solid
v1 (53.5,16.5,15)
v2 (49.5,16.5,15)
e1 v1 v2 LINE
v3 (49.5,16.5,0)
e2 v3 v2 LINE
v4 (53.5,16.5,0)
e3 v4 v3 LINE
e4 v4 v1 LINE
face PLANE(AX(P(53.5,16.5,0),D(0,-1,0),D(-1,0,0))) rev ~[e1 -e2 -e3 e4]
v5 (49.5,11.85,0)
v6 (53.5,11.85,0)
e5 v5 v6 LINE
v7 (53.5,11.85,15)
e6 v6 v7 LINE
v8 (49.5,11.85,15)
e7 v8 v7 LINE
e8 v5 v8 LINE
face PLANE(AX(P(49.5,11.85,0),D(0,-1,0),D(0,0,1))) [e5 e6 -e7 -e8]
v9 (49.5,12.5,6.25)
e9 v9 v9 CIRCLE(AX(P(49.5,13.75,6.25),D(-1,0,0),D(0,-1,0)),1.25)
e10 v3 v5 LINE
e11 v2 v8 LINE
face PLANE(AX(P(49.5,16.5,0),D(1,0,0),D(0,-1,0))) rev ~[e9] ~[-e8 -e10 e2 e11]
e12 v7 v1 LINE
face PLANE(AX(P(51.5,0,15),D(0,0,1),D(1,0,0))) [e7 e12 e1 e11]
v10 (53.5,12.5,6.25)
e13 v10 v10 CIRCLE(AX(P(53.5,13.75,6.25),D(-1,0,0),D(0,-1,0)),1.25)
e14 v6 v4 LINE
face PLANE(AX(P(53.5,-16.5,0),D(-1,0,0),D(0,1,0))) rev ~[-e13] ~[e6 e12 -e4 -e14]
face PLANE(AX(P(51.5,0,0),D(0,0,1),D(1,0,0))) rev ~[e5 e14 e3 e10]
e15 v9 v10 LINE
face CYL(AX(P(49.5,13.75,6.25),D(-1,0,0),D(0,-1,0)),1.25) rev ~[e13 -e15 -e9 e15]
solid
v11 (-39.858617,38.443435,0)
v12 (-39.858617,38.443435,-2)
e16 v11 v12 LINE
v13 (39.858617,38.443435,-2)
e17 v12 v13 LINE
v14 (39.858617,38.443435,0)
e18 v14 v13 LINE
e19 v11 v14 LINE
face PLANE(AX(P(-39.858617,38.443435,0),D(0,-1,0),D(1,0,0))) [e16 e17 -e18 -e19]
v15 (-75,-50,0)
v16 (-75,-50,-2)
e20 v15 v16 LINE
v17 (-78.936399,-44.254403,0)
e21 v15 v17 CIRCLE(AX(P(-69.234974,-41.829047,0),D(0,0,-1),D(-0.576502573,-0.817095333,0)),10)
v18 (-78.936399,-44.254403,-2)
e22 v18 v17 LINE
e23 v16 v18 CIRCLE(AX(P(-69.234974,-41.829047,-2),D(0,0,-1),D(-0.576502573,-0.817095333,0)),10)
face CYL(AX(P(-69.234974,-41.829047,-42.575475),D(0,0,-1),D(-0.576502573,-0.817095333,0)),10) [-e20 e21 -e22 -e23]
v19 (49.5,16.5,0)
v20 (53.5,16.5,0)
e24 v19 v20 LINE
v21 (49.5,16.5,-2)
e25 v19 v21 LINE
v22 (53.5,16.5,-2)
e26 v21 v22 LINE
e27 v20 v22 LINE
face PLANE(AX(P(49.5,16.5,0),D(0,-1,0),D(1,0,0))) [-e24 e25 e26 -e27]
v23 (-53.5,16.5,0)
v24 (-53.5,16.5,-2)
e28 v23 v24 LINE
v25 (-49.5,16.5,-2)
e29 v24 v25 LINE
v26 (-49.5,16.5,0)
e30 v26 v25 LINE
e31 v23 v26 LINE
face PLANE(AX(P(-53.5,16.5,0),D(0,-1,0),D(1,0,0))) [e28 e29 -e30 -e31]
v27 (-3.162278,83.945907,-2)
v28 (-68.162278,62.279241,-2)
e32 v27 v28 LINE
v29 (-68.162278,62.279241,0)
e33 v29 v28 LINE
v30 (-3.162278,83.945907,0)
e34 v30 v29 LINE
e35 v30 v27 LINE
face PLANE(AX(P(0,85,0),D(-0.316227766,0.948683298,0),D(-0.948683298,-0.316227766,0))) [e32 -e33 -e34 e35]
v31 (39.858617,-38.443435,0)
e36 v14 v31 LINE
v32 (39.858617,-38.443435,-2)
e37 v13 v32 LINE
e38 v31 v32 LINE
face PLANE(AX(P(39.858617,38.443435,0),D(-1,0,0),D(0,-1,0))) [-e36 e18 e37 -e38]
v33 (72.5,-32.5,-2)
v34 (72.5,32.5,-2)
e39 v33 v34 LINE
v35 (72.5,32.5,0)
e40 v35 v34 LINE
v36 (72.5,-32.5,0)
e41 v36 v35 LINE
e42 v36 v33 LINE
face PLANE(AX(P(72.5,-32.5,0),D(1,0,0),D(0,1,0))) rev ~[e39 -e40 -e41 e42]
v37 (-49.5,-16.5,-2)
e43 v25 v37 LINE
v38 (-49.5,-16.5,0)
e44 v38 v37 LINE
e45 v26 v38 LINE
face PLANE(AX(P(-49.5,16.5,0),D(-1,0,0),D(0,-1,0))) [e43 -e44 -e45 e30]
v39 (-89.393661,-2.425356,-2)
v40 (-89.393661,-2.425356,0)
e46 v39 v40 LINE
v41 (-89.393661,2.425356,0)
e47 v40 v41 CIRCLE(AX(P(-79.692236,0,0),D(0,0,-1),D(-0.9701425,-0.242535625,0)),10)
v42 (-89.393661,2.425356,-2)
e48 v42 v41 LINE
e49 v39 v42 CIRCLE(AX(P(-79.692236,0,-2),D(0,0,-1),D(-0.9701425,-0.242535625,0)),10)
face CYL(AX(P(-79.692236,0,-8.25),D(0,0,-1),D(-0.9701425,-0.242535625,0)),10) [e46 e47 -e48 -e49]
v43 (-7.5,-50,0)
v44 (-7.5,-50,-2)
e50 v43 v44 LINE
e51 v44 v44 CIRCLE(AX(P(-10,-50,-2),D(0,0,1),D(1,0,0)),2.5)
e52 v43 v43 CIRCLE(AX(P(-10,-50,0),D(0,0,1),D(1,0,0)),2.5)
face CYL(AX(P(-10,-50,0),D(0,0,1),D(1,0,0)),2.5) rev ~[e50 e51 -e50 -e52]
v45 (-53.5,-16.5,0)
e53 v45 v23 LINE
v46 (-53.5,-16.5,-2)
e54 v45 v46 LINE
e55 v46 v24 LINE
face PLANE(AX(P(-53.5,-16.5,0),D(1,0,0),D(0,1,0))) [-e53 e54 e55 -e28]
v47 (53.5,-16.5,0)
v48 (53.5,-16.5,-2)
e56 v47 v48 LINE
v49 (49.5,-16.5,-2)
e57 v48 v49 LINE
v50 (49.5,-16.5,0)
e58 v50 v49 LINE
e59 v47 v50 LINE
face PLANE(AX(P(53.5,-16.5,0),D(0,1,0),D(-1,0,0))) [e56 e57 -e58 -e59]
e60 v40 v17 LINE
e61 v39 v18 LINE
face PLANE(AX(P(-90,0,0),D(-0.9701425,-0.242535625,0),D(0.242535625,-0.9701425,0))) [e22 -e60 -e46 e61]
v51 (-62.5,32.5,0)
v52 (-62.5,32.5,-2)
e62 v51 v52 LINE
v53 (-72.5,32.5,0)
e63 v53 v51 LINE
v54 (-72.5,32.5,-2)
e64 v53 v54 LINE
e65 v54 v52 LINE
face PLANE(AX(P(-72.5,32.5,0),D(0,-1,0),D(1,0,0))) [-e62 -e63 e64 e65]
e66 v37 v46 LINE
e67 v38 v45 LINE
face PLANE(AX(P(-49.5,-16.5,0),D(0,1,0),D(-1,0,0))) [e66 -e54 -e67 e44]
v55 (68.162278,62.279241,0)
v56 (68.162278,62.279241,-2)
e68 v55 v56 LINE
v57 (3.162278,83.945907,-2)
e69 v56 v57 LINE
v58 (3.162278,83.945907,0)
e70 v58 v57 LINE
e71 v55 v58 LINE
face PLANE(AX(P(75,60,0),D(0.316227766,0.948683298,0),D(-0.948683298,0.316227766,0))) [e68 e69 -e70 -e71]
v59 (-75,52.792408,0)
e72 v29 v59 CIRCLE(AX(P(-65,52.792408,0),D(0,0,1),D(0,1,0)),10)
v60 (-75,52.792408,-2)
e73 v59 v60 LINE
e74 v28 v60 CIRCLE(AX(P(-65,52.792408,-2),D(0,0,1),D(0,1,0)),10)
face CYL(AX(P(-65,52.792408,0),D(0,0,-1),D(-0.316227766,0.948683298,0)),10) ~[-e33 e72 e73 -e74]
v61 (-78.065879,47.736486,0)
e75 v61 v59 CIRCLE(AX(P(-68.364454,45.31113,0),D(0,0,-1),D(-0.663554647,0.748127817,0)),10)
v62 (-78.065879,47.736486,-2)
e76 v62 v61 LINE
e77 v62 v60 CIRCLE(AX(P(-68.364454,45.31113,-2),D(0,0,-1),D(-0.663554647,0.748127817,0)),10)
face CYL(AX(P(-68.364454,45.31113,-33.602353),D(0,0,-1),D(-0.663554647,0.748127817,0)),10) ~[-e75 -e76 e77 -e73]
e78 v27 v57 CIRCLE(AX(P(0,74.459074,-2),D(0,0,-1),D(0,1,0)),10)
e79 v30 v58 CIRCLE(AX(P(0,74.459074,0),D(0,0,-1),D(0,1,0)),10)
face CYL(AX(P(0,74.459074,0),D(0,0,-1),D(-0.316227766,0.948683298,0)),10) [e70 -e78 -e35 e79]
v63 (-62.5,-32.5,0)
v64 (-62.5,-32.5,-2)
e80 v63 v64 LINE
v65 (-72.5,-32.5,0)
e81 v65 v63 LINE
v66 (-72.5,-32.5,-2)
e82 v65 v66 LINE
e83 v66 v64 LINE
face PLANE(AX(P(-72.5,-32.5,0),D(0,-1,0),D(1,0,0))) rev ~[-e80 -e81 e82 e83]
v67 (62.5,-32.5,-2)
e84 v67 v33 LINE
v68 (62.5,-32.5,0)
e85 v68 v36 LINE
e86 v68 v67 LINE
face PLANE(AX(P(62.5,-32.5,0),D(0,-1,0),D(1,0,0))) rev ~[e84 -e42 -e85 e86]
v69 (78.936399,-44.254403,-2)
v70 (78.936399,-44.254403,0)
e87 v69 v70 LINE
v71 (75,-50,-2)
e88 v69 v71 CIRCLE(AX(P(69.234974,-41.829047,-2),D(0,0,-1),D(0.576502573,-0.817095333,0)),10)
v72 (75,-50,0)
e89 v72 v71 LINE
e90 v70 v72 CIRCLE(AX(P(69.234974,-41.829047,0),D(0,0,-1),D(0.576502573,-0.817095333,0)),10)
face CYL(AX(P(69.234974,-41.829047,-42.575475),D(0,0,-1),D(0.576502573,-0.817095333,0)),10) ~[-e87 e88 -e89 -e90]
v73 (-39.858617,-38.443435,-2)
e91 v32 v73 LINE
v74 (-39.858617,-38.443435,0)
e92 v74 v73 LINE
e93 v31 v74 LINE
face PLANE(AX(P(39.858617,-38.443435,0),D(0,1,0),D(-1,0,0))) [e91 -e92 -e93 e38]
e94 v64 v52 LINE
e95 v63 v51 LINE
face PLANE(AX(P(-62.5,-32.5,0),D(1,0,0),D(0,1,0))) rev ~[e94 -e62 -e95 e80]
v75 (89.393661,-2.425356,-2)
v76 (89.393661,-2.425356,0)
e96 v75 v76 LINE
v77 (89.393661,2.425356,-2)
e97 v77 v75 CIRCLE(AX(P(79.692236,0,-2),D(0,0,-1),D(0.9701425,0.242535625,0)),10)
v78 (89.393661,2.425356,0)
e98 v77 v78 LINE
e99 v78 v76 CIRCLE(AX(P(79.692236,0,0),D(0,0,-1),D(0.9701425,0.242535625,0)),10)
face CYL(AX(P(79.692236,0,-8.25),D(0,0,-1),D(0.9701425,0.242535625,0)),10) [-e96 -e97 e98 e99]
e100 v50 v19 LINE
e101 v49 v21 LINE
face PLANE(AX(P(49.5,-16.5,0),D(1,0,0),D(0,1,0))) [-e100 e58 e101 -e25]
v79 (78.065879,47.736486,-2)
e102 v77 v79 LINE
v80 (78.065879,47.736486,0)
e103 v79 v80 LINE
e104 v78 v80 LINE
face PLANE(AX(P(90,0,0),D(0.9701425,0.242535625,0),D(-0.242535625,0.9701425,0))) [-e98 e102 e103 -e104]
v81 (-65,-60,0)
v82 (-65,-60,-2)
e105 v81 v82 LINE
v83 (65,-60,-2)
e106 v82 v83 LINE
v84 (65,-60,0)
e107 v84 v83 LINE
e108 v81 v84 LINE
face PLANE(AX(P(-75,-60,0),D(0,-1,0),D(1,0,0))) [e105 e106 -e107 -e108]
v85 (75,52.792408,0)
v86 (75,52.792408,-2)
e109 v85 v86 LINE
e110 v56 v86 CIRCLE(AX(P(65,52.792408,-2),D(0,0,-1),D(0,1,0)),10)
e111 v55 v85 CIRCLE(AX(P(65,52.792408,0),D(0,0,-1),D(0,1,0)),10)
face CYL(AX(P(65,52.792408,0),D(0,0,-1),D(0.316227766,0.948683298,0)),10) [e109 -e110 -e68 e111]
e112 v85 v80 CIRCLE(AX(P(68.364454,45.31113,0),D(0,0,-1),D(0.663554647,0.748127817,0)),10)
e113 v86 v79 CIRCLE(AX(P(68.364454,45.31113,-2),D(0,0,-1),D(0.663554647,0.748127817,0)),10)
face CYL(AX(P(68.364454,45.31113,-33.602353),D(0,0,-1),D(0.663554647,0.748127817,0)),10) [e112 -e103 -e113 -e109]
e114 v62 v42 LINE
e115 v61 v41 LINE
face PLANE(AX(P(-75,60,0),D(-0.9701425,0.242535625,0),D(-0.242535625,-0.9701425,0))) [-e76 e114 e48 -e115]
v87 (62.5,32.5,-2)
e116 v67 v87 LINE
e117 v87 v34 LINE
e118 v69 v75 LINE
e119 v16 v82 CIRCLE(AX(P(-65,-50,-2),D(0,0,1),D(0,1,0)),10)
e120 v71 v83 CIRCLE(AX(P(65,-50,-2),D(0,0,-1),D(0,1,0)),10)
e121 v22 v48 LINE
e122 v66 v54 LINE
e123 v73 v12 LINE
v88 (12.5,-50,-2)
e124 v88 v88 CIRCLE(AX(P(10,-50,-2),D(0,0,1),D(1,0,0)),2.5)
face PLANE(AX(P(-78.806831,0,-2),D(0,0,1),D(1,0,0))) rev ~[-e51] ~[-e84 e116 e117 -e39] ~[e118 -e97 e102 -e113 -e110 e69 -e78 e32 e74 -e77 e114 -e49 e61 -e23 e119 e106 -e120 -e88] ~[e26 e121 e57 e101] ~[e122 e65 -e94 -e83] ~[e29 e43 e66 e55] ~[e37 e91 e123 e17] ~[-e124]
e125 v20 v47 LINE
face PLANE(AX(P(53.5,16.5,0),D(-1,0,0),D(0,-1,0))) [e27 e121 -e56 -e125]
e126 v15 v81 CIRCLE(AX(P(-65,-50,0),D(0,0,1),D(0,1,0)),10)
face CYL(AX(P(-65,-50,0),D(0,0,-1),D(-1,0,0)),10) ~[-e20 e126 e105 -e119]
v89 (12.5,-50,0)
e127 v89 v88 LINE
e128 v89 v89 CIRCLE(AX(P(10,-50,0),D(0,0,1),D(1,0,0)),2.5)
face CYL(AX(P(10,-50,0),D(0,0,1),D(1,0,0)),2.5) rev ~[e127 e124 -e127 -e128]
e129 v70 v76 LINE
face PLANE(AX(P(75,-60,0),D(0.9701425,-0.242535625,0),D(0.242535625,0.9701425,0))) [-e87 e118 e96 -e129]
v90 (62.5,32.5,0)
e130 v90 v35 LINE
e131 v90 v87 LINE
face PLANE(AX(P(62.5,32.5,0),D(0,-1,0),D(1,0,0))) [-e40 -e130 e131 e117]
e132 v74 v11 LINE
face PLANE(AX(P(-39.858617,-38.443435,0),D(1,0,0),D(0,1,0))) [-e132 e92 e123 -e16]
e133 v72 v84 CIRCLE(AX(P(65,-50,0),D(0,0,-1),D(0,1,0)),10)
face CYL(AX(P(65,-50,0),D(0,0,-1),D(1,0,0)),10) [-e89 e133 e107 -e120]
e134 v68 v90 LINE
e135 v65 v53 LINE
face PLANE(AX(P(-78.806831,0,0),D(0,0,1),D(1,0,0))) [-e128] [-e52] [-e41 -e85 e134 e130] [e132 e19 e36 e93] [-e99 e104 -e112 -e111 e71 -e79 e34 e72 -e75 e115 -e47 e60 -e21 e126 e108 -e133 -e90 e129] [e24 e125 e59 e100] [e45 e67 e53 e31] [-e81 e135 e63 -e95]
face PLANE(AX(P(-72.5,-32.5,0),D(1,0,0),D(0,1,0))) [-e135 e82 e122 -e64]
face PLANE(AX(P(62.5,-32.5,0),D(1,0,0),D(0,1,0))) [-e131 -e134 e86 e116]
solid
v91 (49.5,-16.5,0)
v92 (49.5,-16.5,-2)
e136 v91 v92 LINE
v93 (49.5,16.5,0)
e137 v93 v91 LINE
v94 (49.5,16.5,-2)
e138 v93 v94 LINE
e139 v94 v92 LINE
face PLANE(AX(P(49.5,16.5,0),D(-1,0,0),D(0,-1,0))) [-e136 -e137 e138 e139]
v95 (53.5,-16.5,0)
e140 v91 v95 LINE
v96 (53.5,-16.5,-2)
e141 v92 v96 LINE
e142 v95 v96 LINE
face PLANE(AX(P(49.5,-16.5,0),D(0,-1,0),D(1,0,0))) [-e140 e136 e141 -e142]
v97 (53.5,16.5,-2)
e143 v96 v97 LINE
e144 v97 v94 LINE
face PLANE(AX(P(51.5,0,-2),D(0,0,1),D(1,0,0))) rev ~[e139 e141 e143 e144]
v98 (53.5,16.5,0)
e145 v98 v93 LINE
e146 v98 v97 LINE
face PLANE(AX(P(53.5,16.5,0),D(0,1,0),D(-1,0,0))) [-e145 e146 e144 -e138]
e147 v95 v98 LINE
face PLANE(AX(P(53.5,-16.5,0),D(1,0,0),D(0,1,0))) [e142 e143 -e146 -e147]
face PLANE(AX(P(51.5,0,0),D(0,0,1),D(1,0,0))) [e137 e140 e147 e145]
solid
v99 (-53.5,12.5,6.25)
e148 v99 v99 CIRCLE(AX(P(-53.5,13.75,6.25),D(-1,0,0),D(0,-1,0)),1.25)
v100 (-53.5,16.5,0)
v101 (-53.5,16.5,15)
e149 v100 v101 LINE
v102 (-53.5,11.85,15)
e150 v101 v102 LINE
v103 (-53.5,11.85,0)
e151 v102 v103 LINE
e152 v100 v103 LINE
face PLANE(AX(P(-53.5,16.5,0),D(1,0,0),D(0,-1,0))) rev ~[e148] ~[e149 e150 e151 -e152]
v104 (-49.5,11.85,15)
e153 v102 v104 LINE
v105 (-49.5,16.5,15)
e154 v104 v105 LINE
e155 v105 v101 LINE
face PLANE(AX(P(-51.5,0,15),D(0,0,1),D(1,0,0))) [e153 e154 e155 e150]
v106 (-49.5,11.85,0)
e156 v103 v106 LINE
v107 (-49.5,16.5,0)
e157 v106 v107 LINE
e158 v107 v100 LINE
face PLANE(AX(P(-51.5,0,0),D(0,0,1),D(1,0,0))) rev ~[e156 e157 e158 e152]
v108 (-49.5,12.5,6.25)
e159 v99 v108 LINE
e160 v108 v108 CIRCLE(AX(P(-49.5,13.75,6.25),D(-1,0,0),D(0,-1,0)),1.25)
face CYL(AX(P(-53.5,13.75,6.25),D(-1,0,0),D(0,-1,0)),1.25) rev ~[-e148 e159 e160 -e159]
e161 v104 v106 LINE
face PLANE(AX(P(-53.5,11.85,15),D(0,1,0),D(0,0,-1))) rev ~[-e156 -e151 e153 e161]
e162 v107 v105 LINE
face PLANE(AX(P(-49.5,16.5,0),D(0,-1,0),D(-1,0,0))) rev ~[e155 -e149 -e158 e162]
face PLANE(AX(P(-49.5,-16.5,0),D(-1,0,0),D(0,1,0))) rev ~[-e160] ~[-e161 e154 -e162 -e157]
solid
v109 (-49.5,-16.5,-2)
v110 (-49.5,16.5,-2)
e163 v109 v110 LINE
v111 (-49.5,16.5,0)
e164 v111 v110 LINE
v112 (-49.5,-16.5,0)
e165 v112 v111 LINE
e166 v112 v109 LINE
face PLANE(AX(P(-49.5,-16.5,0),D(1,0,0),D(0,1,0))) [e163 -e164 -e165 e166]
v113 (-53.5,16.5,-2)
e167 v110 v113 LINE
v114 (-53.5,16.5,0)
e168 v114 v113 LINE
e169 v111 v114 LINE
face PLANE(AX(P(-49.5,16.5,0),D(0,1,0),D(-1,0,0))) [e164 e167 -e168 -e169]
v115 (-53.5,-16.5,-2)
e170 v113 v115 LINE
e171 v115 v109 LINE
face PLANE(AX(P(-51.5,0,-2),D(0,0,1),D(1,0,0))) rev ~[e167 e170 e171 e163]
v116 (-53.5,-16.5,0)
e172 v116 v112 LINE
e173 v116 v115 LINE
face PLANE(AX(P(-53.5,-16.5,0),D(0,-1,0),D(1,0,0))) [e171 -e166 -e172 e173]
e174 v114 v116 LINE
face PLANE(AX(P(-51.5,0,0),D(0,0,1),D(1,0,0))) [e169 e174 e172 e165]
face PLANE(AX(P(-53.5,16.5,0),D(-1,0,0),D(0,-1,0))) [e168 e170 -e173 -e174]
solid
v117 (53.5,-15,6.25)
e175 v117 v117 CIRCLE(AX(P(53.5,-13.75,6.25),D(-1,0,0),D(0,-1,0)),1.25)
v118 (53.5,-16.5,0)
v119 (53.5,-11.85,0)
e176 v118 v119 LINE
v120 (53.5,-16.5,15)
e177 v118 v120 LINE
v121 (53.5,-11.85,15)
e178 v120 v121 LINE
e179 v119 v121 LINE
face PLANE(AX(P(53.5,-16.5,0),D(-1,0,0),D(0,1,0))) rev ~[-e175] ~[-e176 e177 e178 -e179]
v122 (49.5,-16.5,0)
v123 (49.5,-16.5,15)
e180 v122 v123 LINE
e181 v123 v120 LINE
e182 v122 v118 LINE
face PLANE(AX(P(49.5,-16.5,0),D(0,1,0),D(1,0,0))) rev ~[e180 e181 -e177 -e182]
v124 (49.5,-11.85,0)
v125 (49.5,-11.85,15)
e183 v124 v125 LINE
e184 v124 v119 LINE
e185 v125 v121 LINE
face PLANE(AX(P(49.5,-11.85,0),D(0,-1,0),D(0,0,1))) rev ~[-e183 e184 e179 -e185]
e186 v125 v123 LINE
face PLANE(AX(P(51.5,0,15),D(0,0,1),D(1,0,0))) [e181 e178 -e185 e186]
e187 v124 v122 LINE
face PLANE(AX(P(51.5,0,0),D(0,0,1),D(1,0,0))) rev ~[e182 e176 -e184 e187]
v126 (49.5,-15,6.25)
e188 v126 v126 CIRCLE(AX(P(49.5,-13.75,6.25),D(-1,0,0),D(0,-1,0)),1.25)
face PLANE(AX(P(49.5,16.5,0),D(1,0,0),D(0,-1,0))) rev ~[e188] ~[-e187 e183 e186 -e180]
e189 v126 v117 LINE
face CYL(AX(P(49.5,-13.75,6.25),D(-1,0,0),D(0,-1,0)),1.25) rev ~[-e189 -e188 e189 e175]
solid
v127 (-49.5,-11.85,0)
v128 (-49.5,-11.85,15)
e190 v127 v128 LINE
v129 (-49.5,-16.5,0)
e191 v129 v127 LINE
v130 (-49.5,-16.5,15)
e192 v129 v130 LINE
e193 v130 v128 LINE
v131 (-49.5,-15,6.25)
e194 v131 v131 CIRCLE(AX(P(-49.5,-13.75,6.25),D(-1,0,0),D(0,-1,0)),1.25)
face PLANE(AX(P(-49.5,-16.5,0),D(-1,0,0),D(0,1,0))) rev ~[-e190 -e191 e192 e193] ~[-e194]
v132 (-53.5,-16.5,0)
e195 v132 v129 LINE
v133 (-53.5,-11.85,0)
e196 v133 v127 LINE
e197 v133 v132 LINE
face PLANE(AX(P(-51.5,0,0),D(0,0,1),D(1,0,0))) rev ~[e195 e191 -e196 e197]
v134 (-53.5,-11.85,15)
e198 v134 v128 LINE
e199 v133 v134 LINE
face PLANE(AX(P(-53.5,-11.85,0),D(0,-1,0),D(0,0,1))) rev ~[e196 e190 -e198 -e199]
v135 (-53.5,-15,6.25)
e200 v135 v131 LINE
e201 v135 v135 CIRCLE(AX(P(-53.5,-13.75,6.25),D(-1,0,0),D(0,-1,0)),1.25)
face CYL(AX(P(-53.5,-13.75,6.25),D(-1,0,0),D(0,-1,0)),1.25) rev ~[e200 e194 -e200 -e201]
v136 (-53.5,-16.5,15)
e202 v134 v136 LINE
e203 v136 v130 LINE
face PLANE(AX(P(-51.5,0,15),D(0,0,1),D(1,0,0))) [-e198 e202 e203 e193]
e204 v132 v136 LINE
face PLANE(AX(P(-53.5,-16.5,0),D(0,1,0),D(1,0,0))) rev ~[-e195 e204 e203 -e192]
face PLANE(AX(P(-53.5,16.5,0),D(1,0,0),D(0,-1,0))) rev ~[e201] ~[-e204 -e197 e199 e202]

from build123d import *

# Parameters (mm, degrees)
F0_R         = 2.5
F0_W         = 10
F0_H         = 65
F1_DEPTH     = 2
F2_DEPTH     = 15
F3_R         = 10
F4_R         = 1.25
F5_DEPTH     = 4.4
F6_DEPTH     = 2
F7_R         = 1.25
F8_DEPTH     = 4.7
F7_W         = 23.7
F7_H         = 15
F9_DEPTH     = 4.3
F10_DEPTH    = 2
F11_T1_DEPTH = 83.1509498697
F11_T3_DEPTH = 65.2047050598
F11_T5_DEPTH = 14.5


# Not quite as in the source:
# - a fillet or chamfer that OpenCascade refuses, or shapes differently, is made with other operations: its cross-section is extruded or revolved along the edge and cut away or added


with BuildPart() as f1:
    # F0 (on Top) → F1 (new body)
    with BuildSketch(Plane.XY):
        Polygon((0, 85), (-75, 60), (0, 60), align=None)
        Polygon((0, 85), (0, 60), (75, 60), align=None)
        Polygon((0, 60), (-75, 60), (-75, -60), (0, -60), (75, -60), (75, 60), align=None)
        with Locations((-10, -50)):
            Circle(F0_R, mode=Mode.SUBTRACT)
        with Locations((-67.5, 0)):
            Rectangle(F0_W, F0_H, mode=Mode.SUBTRACT)
        Polygon((-53.5, 16.5), (-49.5, 16.5), (-49.5, 12), (-49.5, -12), (-49.5, -16.5), (-53.5, -16.5), align=None, mode=Mode.SUBTRACT)
        with Locations((10, -50)):
            Circle(F0_R, mode=Mode.SUBTRACT)
        Polygon((39.8586168885, -38.4434349835), (0, -38.4434349835), (-39.8586168885, -38.4434349835), (-39.8586168885, 38.4434349835), (39.8586168885, 38.4434349835), align=None, mode=Mode.SUBTRACT)
        Polygon((49.5, 12), (49.5, 16.5), (53.5, 16.5), (53.5, -16.5), (49.5, -16.5), (49.5, -12), align=None, mode=Mode.SUBTRACT)
        with Locations((67.5, 0)):
            Rectangle(F0_W, F0_H, mode=Mode.SUBTRACT)
    extrude(amount=-F1_DEPTH)

    # F3
    f3_edges = [f1.edges().sort_by_distance(p)[0] for p in [
        (-75, -60, -1),
        (75, -60, -1),
        (75, 60, -1),
        (0, 85, -1),
        (-75, 60, -1),
    ]]
    fillet(f3_edges, radius=F3_R)

    # F0 (on Top) → F10 (join)
    with BuildSketch(Plane.XY):
        Polygon((-75, -60), (-75, 60), (-90, 0), align=None)
        Polygon((90, 0), (75, 60), (75, -60), align=None)
    extrude(amount=-F10_DEPTH)

    # F11: fillet of radius 10 on 6 edges, made by hand

    # F11_s2 → F11_t1 (cut)
    with BuildSketch(Plane.XY.offset(-42.5754749349)):
        with BuildLine():
            ThreePointArc((-75, -50), (-77.484564926, -47.4809714737), (-78.9363992698, -44.2544029208))
            Line((-78.9363992698, -44.2544029208), (-75, -60))
            Line((-75, -60), (-75, -50))
        make_face()
        with BuildLine():
            ThreePointArc((75, -50), (77.484564926, -47.4809714737), (78.9363992698, -44.2544029208))
            Line((78.9363992698, -44.2544029208), (75, -60))
            Line((75, -60), (75, -50))
        make_face()
    extrude(amount=F11_T1_DEPTH, mode=Mode.SUBTRACT)

    # F11_s4 → F11_t3 (cut)
    with BuildSketch(Plane.XY.offset(-33.6023525299)):
        with BuildLine():
            ThreePointArc((75, 52.7924077994), (76.9151696289, 50.4962288752), (78.0658785294, 47.7364858825))
            Line((78.0658785294, 47.7364858825), (75, 60))
            Line((75, 60), (75, 52.7924077994))
        make_face()
        with BuildLine():
            ThreePointArc((-75, 52.7924077994), (-76.9151696289, 50.4962288752), (-78.0658785294, 47.7364858825))
            Line((-78.0658785294, 47.7364858825), (-75, 60))
            Line((-75, 60), (-75, 52.7924077994))
        make_face()
    extrude(amount=F11_T3_DEPTH, mode=Mode.SUBTRACT)

    # F11_s6 → F11_t5 (cut)
    with BuildSketch(Plane.XY.offset(-8.25)):
        with BuildLine():
            ThreePointArc((89.3936609374, 2.4253562504), (89.692235936, 0), (89.3936609374, -2.4253562504))
            Line((89.3936609374, -2.4253562504), (90, 0))
            Line((90, 0), (89.3936609374, 2.4253562504))
        make_face()
        with BuildLine():
            ThreePointArc((-89.3936609374, -2.4253562504), (-89.692235936, 0), (-89.3936609374, 2.4253562504))
            Line((-89.3936609374, 2.4253562504), (-90, 0))
            Line((-90, 0), (-89.3936609374, -2.4253562504))
        make_face()
    extrude(amount=F11_T5_DEPTH, mode=Mode.SUBTRACT)


with BuildPart() as f2:
    # F0 (on Top) → F2 (new body)
    with BuildSketch(Plane.XY):
        Polygon((-49.5, 12), (-49.5, 16.5), (-53.5, 16.5), (-53.5, -16.5), (-49.5, -16.5), (-49.5, -12), align=None)
    extrude(amount=F2_DEPTH)

    # F4 (on face) → F5 (cut)
    with BuildSketch(Plane(origin=(-53.5, 0, 0), x_dir=(0, -1, 0), z_dir=(-1, 0, 0))):
        with Locations((-13.75, 6.25)):
            Circle(F4_R)
        with Locations((13.75, 6.25)):
            Circle(F4_R)
        Polygon((11.85, 15), (0, 15), (-11.85, 15), (-11.85, 0), (11.85, 0), align=None)
    extrude(amount=-F5_DEPTH, mode=Mode.SUBTRACT)


with BuildPart() as f2b:
    # F0 (on Top) → F2, piece 2 (new body)
    with BuildSketch(Plane.XY):
        Polygon((53.5, 16.5), (49.5, 16.5), (49.5, 12), (49.5, -12), (49.5, -16.5), (53.5, -16.5), align=None)
    extrude(amount=F2_DEPTH)

    # F7 (on face) → F8 (cut)
    with BuildSketch(Plane(origin=(49.5, 0, 0), x_dir=(0, -1, 0), z_dir=(-1, 0, 0))):
        with Locations((-13.75, 6.25)):
            Circle(F7_R)
        with Locations((13.75, 6.25)):
            Circle(F7_R)
    extrude(amount=-F8_DEPTH, mode=Mode.SUBTRACT)

    # F7 (on face) → F9 (cut)
    with BuildSketch(Plane(origin=(49.5, 0, 0), x_dir=(0, -1, 0), z_dir=(-1, 0, 0))):
        with Locations((0, 7.5)):
            Rectangle(F7_W, F7_H)
    extrude(amount=-F9_DEPTH, mode=Mode.SUBTRACT)


with BuildPart() as f6:
    # F0 (on Top) → F6 (new body)
    with BuildSketch(Plane.XY):
        Polygon((53.5, 16.5), (49.5, 16.5), (49.5, 12), (49.5, -12), (49.5, -16.5), (53.5, -16.5), align=None)
    extrude(amount=-F6_DEPTH)


with BuildPart() as f6b:
    # F0 (on Top) → F6, piece 2 (new body)
    with BuildSketch(Plane.XY):
        Polygon((-49.5, 12), (-49.5, 16.5), (-53.5, 16.5), (-53.5, -16.5), (-49.5, -16.5), (-49.5, -12), align=None)
    extrude(amount=-F6_DEPTH)


solid = Compound([f1.part, f2.part, f2b.part, f6.part, f6b.part])
